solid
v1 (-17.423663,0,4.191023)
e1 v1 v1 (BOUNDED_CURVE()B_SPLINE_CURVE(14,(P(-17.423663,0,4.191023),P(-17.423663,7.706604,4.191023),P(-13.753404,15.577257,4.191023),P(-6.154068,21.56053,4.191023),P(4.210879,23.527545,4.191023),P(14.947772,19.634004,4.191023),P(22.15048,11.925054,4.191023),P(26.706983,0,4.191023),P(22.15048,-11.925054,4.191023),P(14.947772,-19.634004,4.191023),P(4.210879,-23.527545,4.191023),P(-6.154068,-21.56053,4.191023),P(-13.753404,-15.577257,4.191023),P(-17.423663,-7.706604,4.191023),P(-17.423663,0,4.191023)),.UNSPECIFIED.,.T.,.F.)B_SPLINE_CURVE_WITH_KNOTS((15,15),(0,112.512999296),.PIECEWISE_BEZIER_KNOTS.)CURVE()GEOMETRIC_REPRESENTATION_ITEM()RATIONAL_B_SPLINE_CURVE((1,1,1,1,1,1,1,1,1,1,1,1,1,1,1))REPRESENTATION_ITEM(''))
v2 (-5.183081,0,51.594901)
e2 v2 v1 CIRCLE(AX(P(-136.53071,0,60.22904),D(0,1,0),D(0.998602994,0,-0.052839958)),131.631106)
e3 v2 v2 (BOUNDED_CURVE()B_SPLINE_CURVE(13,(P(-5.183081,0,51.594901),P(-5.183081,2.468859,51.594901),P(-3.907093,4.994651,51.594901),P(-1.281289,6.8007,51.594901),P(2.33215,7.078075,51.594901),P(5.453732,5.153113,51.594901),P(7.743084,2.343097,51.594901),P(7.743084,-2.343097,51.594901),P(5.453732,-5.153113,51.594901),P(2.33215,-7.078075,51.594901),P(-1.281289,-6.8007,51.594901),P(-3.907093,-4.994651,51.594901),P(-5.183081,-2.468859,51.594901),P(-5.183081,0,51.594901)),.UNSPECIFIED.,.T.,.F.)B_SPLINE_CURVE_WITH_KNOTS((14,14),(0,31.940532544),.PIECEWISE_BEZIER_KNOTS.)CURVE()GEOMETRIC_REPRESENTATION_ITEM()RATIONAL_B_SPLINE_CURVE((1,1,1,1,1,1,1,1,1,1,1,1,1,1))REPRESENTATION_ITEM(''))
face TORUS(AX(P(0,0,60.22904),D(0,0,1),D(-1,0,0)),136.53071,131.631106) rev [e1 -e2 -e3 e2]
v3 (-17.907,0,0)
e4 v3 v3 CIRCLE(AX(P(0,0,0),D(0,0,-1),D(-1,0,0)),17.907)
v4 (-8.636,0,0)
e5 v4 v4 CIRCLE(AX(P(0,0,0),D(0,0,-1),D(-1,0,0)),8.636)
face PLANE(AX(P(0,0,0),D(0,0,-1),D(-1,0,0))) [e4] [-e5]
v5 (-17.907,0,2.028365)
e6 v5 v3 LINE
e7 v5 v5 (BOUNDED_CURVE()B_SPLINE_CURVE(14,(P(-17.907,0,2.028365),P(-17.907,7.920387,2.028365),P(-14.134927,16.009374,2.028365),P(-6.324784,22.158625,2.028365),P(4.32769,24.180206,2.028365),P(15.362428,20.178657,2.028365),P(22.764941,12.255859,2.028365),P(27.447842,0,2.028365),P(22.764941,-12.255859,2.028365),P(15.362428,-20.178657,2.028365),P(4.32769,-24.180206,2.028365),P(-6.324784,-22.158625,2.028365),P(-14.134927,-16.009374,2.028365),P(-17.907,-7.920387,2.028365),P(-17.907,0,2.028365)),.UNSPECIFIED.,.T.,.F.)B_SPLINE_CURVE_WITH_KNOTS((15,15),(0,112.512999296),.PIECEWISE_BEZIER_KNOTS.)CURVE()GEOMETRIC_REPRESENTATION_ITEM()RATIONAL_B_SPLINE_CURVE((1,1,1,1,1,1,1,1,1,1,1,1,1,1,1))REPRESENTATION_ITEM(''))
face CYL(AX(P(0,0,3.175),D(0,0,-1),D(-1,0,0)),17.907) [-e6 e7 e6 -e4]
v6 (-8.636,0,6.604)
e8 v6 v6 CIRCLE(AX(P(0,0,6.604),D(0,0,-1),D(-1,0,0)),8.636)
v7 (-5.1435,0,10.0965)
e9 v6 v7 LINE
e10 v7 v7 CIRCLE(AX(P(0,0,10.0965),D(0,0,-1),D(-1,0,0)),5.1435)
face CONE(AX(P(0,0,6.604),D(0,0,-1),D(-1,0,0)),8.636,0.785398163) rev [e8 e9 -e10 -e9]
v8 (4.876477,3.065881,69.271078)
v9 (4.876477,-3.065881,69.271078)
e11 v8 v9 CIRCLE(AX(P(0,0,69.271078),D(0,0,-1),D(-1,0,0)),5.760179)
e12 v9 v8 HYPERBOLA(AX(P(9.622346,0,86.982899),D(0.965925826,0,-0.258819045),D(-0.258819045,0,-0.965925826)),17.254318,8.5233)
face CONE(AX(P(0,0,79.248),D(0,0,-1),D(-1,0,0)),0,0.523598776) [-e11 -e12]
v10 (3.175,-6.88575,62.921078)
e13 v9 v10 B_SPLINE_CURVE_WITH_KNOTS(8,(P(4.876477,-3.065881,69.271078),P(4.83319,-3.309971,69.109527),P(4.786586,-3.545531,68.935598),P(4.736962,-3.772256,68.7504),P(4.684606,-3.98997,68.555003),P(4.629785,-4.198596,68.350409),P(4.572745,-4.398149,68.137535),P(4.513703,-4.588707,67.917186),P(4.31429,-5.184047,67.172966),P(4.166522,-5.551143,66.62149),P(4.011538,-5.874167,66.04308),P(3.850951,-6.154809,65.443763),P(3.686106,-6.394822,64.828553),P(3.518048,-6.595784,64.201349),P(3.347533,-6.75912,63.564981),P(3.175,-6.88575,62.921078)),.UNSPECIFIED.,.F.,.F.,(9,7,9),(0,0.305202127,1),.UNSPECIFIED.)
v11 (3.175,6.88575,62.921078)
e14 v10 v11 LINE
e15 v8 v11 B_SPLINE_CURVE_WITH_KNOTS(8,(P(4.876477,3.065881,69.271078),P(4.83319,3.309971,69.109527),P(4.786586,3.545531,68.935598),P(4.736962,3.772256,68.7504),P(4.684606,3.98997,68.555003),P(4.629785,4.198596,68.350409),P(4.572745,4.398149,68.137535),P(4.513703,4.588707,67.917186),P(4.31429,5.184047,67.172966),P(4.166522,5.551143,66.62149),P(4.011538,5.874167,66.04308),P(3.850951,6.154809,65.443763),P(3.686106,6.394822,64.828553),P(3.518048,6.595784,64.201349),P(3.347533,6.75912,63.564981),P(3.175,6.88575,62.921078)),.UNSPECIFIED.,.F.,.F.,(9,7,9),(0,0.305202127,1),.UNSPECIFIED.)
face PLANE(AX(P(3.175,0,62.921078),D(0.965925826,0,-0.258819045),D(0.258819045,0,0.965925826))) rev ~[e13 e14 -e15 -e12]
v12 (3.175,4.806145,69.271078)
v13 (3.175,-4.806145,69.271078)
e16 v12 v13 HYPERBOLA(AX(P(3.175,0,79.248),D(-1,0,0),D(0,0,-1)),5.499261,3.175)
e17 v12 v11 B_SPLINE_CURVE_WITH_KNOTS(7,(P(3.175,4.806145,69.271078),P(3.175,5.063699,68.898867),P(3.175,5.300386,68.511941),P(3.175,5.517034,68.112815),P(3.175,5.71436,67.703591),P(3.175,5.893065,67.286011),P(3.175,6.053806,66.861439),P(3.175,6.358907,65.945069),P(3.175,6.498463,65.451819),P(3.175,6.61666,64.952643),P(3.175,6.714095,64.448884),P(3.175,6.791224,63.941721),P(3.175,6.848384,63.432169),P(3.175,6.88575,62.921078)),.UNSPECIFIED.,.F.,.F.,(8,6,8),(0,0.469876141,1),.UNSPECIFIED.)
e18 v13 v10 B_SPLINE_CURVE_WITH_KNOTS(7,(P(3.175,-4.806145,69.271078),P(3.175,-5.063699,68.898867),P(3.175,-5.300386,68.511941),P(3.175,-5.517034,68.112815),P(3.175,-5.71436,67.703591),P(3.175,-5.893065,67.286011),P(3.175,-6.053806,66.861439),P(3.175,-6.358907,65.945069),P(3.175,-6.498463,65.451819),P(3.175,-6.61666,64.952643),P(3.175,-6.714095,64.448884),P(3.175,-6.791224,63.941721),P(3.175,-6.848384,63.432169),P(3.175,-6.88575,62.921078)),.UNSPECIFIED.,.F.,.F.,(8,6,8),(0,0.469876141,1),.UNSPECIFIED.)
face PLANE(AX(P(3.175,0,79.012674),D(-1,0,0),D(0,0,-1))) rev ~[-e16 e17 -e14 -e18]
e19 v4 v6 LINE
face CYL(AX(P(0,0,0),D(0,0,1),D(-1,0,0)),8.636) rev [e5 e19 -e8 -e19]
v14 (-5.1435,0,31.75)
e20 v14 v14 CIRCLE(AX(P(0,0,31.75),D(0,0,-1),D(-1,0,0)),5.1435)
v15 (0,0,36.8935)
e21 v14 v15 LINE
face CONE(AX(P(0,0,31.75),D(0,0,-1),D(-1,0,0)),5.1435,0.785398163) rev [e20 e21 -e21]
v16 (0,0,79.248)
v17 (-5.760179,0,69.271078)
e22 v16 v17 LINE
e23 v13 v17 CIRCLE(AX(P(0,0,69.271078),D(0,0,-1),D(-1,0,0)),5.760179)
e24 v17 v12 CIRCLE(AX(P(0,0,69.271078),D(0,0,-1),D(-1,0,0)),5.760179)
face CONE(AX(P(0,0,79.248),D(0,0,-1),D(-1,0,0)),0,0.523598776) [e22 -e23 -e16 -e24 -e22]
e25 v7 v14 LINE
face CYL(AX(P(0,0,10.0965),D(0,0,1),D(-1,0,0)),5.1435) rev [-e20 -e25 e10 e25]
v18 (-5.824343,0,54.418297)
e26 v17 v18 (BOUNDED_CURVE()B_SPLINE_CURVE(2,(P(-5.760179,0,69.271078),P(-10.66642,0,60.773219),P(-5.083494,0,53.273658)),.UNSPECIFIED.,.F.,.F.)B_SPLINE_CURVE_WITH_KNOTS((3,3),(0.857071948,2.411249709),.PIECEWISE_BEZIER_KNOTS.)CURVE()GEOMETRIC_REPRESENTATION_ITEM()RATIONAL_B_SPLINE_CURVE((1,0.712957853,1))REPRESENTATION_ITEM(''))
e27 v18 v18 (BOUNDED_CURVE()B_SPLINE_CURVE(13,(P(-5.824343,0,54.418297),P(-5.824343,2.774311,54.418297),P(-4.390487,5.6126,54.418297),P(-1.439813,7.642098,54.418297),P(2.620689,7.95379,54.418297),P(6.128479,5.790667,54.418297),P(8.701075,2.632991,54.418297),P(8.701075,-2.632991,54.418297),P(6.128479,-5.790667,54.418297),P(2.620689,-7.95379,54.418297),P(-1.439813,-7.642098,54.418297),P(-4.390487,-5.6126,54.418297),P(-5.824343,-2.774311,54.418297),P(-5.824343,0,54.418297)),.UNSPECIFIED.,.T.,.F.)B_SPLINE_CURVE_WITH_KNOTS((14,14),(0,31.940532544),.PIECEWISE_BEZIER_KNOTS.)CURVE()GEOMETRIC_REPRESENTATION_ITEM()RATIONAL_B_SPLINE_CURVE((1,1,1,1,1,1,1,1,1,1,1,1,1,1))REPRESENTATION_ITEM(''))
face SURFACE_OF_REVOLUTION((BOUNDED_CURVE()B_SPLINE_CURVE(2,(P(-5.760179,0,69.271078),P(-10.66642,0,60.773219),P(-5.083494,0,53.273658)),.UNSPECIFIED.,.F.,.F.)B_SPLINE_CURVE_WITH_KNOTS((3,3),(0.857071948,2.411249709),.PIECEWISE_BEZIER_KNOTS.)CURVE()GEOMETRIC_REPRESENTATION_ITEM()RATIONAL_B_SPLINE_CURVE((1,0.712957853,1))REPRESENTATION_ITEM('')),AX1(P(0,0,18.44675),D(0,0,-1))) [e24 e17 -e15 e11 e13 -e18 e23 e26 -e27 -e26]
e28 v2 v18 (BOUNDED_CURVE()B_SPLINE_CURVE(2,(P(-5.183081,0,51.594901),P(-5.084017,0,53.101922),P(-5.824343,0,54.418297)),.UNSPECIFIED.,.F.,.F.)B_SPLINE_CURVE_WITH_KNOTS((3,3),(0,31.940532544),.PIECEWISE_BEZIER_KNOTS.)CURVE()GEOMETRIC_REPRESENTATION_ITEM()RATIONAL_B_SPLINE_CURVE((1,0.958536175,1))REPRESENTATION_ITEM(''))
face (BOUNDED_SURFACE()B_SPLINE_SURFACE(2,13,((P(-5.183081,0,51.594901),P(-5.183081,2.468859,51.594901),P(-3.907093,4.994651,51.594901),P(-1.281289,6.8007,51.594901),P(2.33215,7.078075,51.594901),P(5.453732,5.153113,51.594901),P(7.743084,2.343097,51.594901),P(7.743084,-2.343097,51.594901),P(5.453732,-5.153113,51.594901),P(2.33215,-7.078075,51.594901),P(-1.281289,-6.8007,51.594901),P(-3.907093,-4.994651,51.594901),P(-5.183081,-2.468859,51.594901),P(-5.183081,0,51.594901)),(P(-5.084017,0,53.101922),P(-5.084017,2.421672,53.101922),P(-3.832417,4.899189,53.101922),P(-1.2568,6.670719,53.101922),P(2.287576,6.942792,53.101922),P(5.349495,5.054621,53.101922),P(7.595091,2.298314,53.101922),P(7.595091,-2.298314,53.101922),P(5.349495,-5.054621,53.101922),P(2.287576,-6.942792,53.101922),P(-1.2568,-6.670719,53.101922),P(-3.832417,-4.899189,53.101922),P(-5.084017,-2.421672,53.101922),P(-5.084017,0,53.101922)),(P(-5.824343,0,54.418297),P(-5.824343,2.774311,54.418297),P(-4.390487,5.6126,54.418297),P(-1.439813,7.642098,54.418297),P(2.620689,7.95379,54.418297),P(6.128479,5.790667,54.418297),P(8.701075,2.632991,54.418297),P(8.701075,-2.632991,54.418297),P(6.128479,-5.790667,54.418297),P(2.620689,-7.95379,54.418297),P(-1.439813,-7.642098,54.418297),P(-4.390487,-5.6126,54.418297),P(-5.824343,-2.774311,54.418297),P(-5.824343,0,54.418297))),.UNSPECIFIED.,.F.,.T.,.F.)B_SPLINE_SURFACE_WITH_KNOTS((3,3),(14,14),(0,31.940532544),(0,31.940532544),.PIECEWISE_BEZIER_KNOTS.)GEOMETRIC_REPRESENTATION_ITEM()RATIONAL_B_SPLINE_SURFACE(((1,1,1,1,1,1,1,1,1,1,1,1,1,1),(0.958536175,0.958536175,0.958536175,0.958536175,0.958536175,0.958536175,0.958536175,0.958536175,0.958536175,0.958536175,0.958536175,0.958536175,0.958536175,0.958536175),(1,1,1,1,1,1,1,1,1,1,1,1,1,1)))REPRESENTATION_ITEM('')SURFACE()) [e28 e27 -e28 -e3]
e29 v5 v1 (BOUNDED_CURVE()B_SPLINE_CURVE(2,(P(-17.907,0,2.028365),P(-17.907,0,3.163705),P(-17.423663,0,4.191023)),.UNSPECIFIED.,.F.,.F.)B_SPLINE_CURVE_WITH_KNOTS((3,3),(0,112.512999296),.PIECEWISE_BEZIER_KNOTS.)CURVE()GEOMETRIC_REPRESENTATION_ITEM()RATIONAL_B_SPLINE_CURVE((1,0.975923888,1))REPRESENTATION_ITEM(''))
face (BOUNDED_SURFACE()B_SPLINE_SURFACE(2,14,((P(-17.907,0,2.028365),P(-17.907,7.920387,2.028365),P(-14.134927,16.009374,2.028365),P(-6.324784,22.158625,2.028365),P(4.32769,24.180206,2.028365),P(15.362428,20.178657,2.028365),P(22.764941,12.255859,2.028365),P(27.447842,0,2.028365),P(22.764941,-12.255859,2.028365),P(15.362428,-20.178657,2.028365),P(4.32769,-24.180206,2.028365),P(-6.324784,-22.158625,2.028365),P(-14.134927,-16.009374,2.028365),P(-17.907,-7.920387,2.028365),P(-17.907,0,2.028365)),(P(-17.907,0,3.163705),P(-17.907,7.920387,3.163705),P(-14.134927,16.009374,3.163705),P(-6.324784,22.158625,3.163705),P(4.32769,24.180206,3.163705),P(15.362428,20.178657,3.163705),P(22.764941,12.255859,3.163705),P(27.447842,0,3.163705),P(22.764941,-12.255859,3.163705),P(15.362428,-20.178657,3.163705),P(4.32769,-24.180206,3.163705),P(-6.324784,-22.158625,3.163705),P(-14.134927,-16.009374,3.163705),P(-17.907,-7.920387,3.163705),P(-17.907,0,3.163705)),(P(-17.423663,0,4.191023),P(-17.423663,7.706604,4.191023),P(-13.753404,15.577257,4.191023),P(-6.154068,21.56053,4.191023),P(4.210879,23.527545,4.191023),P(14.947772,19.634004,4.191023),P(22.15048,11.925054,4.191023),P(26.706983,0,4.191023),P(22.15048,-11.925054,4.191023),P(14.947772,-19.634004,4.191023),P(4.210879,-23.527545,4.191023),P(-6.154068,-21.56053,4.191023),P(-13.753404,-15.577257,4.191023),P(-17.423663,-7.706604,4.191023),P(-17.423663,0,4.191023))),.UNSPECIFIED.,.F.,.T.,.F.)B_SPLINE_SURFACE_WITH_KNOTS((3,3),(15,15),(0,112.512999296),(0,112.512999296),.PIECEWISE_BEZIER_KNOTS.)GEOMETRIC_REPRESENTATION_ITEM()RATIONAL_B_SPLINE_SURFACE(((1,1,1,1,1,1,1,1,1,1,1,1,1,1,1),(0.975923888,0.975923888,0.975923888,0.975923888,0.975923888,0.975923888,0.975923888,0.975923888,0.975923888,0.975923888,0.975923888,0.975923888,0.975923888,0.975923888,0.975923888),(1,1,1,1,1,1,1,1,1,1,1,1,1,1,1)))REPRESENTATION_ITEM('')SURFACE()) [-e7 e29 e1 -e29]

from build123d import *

# Parameters (mm, degrees)
F3_DEPTH = 12.7
F4_R     = 5.08


with BuildPart() as f1:
    # F0 (on Front) → F1 (revolve)
    with BuildSketch(Plane.XZ):
        with BuildLine():
            Line((-17.907, 3.175), (-17.907, 0))
            Line((-17.907, 0), (-8.636, 0))
            Line((-8.636, 0), (-8.636, 6.604))
            Line((-8.636, 6.604), (-5.1435, 10.0965))
            Line((-5.1435, 10.0965), (-5.1435, 31.75))
            Line((-5.1435, 31.75), (0, 36.8935))
            Line((0, 36.8935), (0, 79.248))
            Line((0, 79.248), (-5.7601785687, 69.2710780584))
            add(Edge.make_bspline(
                [(-5.7601785687, 69.2710780584), (-10.6664197671, 60.7732190285), (-5.0834936393, 53.2736577196)],
                knots=[0.8570719479, 0.8570719479, 0.8570719479, 2.4112497087, 2.4112497087, 2.4112497087], degree=2, weights=[1, 0.7129578532, 1]))
            ThreePointArc((-5.0834936393, 53.2736577196), (-9.0107667422, 27.5883887463), (-17.907, 3.175))
        make_face()
    revolve(axis=Axis((0, 0, 18.44675), (0, 0, -1)))

    # F2 (on Front) → F3 (cut, symmetric)
    with BuildSketch(Plane.XZ):
        Polygon((7.2810413163, 78.2450328688), (3.175, 79.0126742409), (3.175, 62.9210780584), align=None)
    extrude(amount=F3_DEPTH, both=True, mode=Mode.SUBTRACT)

    # F4
    f4_edges = [f1.edges().sort_by_distance(p)[0] for p in [
        (5.083494, 0, 53.273658),
        (17.907, 0, 3.175),
    ]]
    fillet(f4_edges, radius=F4_R)


solid = f1.part
